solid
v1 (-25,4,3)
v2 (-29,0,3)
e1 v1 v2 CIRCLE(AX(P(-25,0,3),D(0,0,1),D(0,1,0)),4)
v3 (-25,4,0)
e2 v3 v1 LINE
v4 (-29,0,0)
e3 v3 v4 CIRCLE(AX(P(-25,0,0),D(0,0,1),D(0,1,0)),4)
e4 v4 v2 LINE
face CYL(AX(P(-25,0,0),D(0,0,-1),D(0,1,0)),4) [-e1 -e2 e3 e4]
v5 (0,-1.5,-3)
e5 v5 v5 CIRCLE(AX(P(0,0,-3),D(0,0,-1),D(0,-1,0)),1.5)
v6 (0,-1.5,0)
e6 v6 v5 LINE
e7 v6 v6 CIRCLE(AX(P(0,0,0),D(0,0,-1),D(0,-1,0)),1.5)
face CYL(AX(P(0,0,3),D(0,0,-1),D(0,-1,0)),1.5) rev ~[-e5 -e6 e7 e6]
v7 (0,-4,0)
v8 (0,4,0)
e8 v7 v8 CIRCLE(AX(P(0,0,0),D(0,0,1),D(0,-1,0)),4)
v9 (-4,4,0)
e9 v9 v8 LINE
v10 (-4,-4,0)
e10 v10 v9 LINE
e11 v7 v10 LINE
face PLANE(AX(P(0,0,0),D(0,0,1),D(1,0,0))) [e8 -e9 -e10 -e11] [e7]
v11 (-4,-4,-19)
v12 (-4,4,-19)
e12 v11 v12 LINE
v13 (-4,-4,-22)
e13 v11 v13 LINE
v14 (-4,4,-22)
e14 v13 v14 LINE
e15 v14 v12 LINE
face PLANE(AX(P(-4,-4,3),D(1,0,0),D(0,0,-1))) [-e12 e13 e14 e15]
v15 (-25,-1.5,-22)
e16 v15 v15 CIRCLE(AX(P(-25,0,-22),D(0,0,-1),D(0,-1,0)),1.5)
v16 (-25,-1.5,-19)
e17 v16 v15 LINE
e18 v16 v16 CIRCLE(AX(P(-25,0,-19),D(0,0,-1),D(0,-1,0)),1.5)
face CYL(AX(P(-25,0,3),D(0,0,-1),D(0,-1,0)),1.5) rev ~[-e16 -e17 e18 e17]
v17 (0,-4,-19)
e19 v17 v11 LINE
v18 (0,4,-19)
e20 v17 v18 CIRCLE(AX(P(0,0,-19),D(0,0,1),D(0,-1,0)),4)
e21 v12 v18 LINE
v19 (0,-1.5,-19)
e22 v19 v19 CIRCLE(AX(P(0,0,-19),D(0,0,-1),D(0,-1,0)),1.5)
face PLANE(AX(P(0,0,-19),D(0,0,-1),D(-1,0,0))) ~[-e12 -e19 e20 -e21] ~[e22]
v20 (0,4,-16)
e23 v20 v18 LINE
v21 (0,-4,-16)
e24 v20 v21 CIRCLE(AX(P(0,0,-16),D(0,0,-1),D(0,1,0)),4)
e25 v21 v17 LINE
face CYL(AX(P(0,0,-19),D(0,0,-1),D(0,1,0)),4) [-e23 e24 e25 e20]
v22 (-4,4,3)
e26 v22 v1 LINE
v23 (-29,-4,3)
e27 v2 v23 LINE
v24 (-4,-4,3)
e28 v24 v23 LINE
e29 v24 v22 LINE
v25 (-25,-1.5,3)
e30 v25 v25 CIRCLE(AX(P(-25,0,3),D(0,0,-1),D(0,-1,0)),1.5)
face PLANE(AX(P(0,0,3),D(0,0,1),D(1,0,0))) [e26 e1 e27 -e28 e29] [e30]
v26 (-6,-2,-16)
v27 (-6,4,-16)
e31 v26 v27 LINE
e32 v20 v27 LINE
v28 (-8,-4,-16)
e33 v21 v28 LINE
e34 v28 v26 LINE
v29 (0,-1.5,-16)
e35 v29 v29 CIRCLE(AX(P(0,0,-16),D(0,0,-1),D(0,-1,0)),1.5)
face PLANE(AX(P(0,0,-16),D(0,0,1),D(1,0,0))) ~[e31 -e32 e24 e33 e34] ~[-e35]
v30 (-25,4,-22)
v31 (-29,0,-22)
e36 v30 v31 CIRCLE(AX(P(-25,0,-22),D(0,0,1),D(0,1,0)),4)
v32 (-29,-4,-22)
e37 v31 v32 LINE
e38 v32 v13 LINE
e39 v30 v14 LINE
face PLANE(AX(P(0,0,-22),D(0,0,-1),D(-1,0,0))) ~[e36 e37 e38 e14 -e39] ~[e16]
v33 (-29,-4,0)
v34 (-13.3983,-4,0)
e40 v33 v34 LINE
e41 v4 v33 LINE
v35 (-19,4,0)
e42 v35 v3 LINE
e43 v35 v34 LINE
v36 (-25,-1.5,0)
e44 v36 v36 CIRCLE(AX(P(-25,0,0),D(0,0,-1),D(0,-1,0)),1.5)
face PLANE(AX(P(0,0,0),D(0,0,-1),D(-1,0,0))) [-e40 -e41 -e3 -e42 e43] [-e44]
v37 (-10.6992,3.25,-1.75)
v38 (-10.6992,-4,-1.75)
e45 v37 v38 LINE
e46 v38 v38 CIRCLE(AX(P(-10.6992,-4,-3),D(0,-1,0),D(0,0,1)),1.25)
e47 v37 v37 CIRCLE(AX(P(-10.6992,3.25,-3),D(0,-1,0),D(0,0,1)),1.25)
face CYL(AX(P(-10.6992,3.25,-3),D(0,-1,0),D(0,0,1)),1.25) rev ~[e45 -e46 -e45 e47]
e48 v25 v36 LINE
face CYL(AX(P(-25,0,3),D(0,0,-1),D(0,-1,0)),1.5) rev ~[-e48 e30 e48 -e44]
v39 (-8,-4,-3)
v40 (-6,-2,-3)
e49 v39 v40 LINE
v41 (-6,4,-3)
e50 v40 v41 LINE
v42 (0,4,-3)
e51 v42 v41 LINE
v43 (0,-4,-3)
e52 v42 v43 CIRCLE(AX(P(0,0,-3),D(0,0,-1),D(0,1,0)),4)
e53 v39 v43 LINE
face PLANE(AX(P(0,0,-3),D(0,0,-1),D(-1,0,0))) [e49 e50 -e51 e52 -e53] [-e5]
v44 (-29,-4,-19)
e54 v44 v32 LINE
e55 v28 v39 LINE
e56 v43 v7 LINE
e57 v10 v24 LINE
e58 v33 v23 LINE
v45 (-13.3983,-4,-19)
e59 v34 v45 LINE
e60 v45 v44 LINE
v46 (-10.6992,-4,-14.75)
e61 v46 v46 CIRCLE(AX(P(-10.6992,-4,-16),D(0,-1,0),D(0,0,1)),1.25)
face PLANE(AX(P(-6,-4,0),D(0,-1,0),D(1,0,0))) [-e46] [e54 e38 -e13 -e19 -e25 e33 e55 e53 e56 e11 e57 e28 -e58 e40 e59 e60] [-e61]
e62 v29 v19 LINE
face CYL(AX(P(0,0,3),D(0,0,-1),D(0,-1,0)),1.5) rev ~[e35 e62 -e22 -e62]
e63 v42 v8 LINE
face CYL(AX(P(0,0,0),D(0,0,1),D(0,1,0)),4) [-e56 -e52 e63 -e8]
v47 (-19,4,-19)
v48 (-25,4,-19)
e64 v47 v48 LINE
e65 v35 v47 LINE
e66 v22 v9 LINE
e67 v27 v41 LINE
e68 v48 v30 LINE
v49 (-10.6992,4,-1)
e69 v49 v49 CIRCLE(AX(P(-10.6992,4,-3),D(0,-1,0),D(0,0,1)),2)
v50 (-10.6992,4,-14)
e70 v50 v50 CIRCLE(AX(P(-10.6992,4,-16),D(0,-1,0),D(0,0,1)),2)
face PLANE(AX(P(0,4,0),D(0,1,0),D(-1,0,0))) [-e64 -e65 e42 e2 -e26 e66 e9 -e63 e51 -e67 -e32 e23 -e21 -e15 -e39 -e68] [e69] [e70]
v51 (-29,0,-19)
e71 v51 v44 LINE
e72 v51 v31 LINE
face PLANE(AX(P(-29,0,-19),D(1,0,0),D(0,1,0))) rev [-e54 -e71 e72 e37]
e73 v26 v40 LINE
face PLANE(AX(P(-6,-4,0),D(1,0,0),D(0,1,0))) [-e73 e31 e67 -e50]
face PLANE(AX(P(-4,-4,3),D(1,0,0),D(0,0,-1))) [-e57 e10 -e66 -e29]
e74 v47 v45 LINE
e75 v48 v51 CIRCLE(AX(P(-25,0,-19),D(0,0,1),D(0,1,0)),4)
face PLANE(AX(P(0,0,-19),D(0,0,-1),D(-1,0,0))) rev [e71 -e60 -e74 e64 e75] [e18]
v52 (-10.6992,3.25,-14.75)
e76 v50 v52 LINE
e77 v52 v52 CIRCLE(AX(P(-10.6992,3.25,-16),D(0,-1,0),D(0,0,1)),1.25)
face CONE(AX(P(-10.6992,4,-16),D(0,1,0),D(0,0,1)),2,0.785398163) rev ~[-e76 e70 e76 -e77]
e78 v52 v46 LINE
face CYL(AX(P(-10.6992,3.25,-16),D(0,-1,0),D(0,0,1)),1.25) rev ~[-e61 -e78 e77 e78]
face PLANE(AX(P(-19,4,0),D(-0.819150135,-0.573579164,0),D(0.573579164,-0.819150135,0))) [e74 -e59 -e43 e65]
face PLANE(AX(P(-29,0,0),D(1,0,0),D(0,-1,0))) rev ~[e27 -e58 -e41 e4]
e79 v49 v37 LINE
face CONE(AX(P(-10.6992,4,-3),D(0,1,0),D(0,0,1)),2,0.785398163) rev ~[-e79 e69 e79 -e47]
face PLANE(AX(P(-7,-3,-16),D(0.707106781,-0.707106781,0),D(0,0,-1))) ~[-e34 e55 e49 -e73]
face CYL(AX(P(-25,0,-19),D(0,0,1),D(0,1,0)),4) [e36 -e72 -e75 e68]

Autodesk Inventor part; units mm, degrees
ref_plane "YZ Plane" through (0, 0, 0) normal (1, 0, 0) x (0, 1, 0)
ref_plane "XZ Plane" through (0, 0, 0) normal (0, 1, 0) x (-1, 0, 0)
ref_plane "XY Plane" through (0, 0, 0) normal (0, 0, 1) x (1, 0, 0)
sketch "Skizze1" plane through (0, 0, 0) normal (0, 0, 1) x (1, 0, 0)
  circle A0 centre (0, 0) radius 4 construction
  circle A1 centre (-25, 0) radius 4 construction
  line L0 (-25, 0) -> (0, 0) construction
  line L1 (-29, 0) -> (-29, -4)
  line L2 (-29, -4) -> (0, -4)
  line L3 (0, 4) -> (-25, 4)
  arc A2 (-25, 4) -> (-29, 0) centre (-25, 0) ccw
  arc A3 (0, -4) -> (0, 4) centre (0, 0) ccw
  dimension "d0" = 8
  dimension "d1" = 25
extrude "Extrusion1" add sketch "Skizze1" along normal blind 3
sketch "Skizze2" plane through (0, 0, 0) normal (0, 0, -1) x (-1, 0, 0)
  arc A0 (29, 0) -> (25, 4) centre (25, 0) ccw projected
  line L0 (0, 4) -> (25, 4) projected
  arc A1 (0, 4) -> (0, -4) centre (0, 0) ccw projected
  line L1 (29, -4) -> (0, -4) projected
  line L2 (6, 4) -> (19, 4)
  line L3 (19, 4) -> (19, -4)
  line L4 (19, -4) -> (6, -4)
  line L5 (6, -4) -> (6, 4)
  dimension "d4" = 4
  dimension "d5" = 6
  dimension "d6" = 6
extrude "Extrusion2" add sketch "Skizze2" along normal blind 9.5 contours L0 L3 L1 L5
sketch "Skizze3" plane through (0, 0, 0) normal (0, 0, -1) x (-1, 0, 0)
  line L0 (6, -4) -> (6, 4) projected
  line L1 (0, 4) -> (6, 4) projected
  arc A0 (0, 4) -> (0, -4) centre (0, 0) ccw projected
  line L2 (6, -4) -> (0, -4) projected
extrude "Extrusion3" add sketch "Skizze3" along normal blind 3
sketch "Skizze4" plane through (0, 0, 3) normal (0, 0, 1) x (1, 0, 0)
  line L0 (-6, 4) -> (-6, -4) projected
  line L1 (-6, 4) -> (0, 4) projected
  arc A0 (0, -4) -> (0, 4) centre (0, 0) ccw projected
  line L2 (0, -4) -> (-6, -4) projected
extrude "Extrusion4" cut sketch "Skizze4" against normal blind 3
mirror "Spiegeln1" about plane through (-12.5, 0, -9.5) normal (0, 0, -1)
sketch "Skizze5" plane through (0, 0, 0) normal (0, 0, -1) x (-1, 0, 0)
  line L0 (19, 4) -> (19, -4) projected
  line L1 (19, 4) -> (25, 4) projected
  line L2 (19, 4) -> (13.3983, -4)
  line L3 (13.3983, -4) -> (19, -4)
  point P0 (0, 0)
  dimension "d13" = 35
extrude "Extrusion5" cut sketch "Skizze5" along normal up to surface (19 mm away)
sketch "Skizze6" plane through (0, 0, 3) normal (0, 0, 1) x (1, 0, 0)
  arc A0 (-25, 4) -> (-29, 0) centre (-25, 0) ccw projected
  point P0 (0, 0)
hole "Bohrung1" at (-25, 0, 3) direction (0, 0, -1) diameter 3 end through all
hole "Bohrung2" at (0, 0, 3) direction (0, 0, -1) diameter 3 end through all
sketch "Skizze7" plane through (-6, -4, 3) normal (1, 0, 0) x (0, 0, -1)
  line L0 (0, 0) -> (0, 8) projected
  line L1 (3, 0) -> (0, 0) projected
  line L2 (3, 0) -> (3, 8) projected
  line L3 (0, 8) -> (3, 8) projected
  line L4 (22, 0) -> (25, 0) projected
  line L5 (25, 0) -> (25, 8) projected
  line L6 (25, 8) -> (22, 8) projected
  line L7 (22, 0) -> (22, 8) projected
  line L8 (22, 0) -> (25, 0) projected
  point P0 (3, 4)
extrude "Extrusion6" add sketch "Skizze7" along normal blind 2
chamfer "Fase1" distance 2 angle 45 1 edges at (-6, -4, -9.5)
sketch "Skizze8" plane through (-25, 4, 3) normal (0, 1, 0) x (1, 0, 0)
  line L0 (17, 19) -> (25, 19) projected
  line L1 (17, 6) -> (17, 19) projected
  line L2 (25, 6) -> (17, 6) projected
  line L3 (25, 6) -> (25, 3) projected
  line L4 (25, 3) -> (21, 3) projected
  line L5 (21, 0) -> (21, 3) projected
  line L6 (-4, 0) -> (21, 0) projected
  line L7 (-4, 3) -> (-4, 0) projected
  line L8 (-4, 3) -> (11.6017, 3) projected
  line L9 (11.6017, 3) -> (11.6017, 22) projected
  line L10 (11.6017, 22) -> (-4, 22) projected
  line L11 (-4, 22) -> (-4, 25) projected
  line L12 (-4, 25) -> (21, 25) projected
  line L13 (21, 22) -> (21, 25) projected
  line L14 (25, 22) -> (21, 22) projected
  line L15 (25, 19) -> (25, 22) projected
  line L16 (17, 19) -> (11.6017, 19)
  line L17 (17, 6) -> (11.6017, 6)
  point P0 (14.3008, 19)
  point P1 (14.3008, 6)
hole "Bohrung3" at (-10.6992, 4, -16) at (-10.6992, 4, -3) direction (0, -1, 0) diameter 2.5 end through all countersink diameter 4 countersink angle 90
sketch "Skizze9" plane through (0, 0, 0) normal (0, 0, 1) x (1, 0, 0)
  line L0 (-4, 4) -> (-4, -4) projected
  line L1 (0, -4) -> (-4, -4) projected
  arc A0 (0, -4) -> (0, 4) centre (0, 0) ccw projected
  line L2 (-4, 4) -> (0, 4) projected
  circle A1 centre (0, 0) radius 1.5 projected
  circle A2 centre (0, 0) radius 4
equation "\"d0\" = Finger_diameter"
equation "\"d1\" = FingerLaenge_B"
equation "\"d2\" = FingerWall"
equation "\"d5\" = 1.5 * d4"
equation "\"d6\" = d5"
equation "\"d7\" = -0.5 * FingerWall + 0.5 * Finger_width"
equation "\"d9\" = FingerWall"
equation "\"d11\" = FingerWall"
equation "\"d29\" = bearingHole"
equation "\"FingerLaenge_B\" = 25"
equation "\"Hebel_B\" = 25"
equation "\"Finger_width\" = 22"
equation "\"Finger_diameter\" = 8"
equation "\"FingerWall\" = 3"
equation "\"Hebel_basis_2\" = 15"
equation "\"Join_width\" = 3"
equation "\"bearingHole\" = 3"
equation "\"bearingWall\" = 4"
equation "\"support_D\" = 0.25"
properties part number "FingerPartB"
